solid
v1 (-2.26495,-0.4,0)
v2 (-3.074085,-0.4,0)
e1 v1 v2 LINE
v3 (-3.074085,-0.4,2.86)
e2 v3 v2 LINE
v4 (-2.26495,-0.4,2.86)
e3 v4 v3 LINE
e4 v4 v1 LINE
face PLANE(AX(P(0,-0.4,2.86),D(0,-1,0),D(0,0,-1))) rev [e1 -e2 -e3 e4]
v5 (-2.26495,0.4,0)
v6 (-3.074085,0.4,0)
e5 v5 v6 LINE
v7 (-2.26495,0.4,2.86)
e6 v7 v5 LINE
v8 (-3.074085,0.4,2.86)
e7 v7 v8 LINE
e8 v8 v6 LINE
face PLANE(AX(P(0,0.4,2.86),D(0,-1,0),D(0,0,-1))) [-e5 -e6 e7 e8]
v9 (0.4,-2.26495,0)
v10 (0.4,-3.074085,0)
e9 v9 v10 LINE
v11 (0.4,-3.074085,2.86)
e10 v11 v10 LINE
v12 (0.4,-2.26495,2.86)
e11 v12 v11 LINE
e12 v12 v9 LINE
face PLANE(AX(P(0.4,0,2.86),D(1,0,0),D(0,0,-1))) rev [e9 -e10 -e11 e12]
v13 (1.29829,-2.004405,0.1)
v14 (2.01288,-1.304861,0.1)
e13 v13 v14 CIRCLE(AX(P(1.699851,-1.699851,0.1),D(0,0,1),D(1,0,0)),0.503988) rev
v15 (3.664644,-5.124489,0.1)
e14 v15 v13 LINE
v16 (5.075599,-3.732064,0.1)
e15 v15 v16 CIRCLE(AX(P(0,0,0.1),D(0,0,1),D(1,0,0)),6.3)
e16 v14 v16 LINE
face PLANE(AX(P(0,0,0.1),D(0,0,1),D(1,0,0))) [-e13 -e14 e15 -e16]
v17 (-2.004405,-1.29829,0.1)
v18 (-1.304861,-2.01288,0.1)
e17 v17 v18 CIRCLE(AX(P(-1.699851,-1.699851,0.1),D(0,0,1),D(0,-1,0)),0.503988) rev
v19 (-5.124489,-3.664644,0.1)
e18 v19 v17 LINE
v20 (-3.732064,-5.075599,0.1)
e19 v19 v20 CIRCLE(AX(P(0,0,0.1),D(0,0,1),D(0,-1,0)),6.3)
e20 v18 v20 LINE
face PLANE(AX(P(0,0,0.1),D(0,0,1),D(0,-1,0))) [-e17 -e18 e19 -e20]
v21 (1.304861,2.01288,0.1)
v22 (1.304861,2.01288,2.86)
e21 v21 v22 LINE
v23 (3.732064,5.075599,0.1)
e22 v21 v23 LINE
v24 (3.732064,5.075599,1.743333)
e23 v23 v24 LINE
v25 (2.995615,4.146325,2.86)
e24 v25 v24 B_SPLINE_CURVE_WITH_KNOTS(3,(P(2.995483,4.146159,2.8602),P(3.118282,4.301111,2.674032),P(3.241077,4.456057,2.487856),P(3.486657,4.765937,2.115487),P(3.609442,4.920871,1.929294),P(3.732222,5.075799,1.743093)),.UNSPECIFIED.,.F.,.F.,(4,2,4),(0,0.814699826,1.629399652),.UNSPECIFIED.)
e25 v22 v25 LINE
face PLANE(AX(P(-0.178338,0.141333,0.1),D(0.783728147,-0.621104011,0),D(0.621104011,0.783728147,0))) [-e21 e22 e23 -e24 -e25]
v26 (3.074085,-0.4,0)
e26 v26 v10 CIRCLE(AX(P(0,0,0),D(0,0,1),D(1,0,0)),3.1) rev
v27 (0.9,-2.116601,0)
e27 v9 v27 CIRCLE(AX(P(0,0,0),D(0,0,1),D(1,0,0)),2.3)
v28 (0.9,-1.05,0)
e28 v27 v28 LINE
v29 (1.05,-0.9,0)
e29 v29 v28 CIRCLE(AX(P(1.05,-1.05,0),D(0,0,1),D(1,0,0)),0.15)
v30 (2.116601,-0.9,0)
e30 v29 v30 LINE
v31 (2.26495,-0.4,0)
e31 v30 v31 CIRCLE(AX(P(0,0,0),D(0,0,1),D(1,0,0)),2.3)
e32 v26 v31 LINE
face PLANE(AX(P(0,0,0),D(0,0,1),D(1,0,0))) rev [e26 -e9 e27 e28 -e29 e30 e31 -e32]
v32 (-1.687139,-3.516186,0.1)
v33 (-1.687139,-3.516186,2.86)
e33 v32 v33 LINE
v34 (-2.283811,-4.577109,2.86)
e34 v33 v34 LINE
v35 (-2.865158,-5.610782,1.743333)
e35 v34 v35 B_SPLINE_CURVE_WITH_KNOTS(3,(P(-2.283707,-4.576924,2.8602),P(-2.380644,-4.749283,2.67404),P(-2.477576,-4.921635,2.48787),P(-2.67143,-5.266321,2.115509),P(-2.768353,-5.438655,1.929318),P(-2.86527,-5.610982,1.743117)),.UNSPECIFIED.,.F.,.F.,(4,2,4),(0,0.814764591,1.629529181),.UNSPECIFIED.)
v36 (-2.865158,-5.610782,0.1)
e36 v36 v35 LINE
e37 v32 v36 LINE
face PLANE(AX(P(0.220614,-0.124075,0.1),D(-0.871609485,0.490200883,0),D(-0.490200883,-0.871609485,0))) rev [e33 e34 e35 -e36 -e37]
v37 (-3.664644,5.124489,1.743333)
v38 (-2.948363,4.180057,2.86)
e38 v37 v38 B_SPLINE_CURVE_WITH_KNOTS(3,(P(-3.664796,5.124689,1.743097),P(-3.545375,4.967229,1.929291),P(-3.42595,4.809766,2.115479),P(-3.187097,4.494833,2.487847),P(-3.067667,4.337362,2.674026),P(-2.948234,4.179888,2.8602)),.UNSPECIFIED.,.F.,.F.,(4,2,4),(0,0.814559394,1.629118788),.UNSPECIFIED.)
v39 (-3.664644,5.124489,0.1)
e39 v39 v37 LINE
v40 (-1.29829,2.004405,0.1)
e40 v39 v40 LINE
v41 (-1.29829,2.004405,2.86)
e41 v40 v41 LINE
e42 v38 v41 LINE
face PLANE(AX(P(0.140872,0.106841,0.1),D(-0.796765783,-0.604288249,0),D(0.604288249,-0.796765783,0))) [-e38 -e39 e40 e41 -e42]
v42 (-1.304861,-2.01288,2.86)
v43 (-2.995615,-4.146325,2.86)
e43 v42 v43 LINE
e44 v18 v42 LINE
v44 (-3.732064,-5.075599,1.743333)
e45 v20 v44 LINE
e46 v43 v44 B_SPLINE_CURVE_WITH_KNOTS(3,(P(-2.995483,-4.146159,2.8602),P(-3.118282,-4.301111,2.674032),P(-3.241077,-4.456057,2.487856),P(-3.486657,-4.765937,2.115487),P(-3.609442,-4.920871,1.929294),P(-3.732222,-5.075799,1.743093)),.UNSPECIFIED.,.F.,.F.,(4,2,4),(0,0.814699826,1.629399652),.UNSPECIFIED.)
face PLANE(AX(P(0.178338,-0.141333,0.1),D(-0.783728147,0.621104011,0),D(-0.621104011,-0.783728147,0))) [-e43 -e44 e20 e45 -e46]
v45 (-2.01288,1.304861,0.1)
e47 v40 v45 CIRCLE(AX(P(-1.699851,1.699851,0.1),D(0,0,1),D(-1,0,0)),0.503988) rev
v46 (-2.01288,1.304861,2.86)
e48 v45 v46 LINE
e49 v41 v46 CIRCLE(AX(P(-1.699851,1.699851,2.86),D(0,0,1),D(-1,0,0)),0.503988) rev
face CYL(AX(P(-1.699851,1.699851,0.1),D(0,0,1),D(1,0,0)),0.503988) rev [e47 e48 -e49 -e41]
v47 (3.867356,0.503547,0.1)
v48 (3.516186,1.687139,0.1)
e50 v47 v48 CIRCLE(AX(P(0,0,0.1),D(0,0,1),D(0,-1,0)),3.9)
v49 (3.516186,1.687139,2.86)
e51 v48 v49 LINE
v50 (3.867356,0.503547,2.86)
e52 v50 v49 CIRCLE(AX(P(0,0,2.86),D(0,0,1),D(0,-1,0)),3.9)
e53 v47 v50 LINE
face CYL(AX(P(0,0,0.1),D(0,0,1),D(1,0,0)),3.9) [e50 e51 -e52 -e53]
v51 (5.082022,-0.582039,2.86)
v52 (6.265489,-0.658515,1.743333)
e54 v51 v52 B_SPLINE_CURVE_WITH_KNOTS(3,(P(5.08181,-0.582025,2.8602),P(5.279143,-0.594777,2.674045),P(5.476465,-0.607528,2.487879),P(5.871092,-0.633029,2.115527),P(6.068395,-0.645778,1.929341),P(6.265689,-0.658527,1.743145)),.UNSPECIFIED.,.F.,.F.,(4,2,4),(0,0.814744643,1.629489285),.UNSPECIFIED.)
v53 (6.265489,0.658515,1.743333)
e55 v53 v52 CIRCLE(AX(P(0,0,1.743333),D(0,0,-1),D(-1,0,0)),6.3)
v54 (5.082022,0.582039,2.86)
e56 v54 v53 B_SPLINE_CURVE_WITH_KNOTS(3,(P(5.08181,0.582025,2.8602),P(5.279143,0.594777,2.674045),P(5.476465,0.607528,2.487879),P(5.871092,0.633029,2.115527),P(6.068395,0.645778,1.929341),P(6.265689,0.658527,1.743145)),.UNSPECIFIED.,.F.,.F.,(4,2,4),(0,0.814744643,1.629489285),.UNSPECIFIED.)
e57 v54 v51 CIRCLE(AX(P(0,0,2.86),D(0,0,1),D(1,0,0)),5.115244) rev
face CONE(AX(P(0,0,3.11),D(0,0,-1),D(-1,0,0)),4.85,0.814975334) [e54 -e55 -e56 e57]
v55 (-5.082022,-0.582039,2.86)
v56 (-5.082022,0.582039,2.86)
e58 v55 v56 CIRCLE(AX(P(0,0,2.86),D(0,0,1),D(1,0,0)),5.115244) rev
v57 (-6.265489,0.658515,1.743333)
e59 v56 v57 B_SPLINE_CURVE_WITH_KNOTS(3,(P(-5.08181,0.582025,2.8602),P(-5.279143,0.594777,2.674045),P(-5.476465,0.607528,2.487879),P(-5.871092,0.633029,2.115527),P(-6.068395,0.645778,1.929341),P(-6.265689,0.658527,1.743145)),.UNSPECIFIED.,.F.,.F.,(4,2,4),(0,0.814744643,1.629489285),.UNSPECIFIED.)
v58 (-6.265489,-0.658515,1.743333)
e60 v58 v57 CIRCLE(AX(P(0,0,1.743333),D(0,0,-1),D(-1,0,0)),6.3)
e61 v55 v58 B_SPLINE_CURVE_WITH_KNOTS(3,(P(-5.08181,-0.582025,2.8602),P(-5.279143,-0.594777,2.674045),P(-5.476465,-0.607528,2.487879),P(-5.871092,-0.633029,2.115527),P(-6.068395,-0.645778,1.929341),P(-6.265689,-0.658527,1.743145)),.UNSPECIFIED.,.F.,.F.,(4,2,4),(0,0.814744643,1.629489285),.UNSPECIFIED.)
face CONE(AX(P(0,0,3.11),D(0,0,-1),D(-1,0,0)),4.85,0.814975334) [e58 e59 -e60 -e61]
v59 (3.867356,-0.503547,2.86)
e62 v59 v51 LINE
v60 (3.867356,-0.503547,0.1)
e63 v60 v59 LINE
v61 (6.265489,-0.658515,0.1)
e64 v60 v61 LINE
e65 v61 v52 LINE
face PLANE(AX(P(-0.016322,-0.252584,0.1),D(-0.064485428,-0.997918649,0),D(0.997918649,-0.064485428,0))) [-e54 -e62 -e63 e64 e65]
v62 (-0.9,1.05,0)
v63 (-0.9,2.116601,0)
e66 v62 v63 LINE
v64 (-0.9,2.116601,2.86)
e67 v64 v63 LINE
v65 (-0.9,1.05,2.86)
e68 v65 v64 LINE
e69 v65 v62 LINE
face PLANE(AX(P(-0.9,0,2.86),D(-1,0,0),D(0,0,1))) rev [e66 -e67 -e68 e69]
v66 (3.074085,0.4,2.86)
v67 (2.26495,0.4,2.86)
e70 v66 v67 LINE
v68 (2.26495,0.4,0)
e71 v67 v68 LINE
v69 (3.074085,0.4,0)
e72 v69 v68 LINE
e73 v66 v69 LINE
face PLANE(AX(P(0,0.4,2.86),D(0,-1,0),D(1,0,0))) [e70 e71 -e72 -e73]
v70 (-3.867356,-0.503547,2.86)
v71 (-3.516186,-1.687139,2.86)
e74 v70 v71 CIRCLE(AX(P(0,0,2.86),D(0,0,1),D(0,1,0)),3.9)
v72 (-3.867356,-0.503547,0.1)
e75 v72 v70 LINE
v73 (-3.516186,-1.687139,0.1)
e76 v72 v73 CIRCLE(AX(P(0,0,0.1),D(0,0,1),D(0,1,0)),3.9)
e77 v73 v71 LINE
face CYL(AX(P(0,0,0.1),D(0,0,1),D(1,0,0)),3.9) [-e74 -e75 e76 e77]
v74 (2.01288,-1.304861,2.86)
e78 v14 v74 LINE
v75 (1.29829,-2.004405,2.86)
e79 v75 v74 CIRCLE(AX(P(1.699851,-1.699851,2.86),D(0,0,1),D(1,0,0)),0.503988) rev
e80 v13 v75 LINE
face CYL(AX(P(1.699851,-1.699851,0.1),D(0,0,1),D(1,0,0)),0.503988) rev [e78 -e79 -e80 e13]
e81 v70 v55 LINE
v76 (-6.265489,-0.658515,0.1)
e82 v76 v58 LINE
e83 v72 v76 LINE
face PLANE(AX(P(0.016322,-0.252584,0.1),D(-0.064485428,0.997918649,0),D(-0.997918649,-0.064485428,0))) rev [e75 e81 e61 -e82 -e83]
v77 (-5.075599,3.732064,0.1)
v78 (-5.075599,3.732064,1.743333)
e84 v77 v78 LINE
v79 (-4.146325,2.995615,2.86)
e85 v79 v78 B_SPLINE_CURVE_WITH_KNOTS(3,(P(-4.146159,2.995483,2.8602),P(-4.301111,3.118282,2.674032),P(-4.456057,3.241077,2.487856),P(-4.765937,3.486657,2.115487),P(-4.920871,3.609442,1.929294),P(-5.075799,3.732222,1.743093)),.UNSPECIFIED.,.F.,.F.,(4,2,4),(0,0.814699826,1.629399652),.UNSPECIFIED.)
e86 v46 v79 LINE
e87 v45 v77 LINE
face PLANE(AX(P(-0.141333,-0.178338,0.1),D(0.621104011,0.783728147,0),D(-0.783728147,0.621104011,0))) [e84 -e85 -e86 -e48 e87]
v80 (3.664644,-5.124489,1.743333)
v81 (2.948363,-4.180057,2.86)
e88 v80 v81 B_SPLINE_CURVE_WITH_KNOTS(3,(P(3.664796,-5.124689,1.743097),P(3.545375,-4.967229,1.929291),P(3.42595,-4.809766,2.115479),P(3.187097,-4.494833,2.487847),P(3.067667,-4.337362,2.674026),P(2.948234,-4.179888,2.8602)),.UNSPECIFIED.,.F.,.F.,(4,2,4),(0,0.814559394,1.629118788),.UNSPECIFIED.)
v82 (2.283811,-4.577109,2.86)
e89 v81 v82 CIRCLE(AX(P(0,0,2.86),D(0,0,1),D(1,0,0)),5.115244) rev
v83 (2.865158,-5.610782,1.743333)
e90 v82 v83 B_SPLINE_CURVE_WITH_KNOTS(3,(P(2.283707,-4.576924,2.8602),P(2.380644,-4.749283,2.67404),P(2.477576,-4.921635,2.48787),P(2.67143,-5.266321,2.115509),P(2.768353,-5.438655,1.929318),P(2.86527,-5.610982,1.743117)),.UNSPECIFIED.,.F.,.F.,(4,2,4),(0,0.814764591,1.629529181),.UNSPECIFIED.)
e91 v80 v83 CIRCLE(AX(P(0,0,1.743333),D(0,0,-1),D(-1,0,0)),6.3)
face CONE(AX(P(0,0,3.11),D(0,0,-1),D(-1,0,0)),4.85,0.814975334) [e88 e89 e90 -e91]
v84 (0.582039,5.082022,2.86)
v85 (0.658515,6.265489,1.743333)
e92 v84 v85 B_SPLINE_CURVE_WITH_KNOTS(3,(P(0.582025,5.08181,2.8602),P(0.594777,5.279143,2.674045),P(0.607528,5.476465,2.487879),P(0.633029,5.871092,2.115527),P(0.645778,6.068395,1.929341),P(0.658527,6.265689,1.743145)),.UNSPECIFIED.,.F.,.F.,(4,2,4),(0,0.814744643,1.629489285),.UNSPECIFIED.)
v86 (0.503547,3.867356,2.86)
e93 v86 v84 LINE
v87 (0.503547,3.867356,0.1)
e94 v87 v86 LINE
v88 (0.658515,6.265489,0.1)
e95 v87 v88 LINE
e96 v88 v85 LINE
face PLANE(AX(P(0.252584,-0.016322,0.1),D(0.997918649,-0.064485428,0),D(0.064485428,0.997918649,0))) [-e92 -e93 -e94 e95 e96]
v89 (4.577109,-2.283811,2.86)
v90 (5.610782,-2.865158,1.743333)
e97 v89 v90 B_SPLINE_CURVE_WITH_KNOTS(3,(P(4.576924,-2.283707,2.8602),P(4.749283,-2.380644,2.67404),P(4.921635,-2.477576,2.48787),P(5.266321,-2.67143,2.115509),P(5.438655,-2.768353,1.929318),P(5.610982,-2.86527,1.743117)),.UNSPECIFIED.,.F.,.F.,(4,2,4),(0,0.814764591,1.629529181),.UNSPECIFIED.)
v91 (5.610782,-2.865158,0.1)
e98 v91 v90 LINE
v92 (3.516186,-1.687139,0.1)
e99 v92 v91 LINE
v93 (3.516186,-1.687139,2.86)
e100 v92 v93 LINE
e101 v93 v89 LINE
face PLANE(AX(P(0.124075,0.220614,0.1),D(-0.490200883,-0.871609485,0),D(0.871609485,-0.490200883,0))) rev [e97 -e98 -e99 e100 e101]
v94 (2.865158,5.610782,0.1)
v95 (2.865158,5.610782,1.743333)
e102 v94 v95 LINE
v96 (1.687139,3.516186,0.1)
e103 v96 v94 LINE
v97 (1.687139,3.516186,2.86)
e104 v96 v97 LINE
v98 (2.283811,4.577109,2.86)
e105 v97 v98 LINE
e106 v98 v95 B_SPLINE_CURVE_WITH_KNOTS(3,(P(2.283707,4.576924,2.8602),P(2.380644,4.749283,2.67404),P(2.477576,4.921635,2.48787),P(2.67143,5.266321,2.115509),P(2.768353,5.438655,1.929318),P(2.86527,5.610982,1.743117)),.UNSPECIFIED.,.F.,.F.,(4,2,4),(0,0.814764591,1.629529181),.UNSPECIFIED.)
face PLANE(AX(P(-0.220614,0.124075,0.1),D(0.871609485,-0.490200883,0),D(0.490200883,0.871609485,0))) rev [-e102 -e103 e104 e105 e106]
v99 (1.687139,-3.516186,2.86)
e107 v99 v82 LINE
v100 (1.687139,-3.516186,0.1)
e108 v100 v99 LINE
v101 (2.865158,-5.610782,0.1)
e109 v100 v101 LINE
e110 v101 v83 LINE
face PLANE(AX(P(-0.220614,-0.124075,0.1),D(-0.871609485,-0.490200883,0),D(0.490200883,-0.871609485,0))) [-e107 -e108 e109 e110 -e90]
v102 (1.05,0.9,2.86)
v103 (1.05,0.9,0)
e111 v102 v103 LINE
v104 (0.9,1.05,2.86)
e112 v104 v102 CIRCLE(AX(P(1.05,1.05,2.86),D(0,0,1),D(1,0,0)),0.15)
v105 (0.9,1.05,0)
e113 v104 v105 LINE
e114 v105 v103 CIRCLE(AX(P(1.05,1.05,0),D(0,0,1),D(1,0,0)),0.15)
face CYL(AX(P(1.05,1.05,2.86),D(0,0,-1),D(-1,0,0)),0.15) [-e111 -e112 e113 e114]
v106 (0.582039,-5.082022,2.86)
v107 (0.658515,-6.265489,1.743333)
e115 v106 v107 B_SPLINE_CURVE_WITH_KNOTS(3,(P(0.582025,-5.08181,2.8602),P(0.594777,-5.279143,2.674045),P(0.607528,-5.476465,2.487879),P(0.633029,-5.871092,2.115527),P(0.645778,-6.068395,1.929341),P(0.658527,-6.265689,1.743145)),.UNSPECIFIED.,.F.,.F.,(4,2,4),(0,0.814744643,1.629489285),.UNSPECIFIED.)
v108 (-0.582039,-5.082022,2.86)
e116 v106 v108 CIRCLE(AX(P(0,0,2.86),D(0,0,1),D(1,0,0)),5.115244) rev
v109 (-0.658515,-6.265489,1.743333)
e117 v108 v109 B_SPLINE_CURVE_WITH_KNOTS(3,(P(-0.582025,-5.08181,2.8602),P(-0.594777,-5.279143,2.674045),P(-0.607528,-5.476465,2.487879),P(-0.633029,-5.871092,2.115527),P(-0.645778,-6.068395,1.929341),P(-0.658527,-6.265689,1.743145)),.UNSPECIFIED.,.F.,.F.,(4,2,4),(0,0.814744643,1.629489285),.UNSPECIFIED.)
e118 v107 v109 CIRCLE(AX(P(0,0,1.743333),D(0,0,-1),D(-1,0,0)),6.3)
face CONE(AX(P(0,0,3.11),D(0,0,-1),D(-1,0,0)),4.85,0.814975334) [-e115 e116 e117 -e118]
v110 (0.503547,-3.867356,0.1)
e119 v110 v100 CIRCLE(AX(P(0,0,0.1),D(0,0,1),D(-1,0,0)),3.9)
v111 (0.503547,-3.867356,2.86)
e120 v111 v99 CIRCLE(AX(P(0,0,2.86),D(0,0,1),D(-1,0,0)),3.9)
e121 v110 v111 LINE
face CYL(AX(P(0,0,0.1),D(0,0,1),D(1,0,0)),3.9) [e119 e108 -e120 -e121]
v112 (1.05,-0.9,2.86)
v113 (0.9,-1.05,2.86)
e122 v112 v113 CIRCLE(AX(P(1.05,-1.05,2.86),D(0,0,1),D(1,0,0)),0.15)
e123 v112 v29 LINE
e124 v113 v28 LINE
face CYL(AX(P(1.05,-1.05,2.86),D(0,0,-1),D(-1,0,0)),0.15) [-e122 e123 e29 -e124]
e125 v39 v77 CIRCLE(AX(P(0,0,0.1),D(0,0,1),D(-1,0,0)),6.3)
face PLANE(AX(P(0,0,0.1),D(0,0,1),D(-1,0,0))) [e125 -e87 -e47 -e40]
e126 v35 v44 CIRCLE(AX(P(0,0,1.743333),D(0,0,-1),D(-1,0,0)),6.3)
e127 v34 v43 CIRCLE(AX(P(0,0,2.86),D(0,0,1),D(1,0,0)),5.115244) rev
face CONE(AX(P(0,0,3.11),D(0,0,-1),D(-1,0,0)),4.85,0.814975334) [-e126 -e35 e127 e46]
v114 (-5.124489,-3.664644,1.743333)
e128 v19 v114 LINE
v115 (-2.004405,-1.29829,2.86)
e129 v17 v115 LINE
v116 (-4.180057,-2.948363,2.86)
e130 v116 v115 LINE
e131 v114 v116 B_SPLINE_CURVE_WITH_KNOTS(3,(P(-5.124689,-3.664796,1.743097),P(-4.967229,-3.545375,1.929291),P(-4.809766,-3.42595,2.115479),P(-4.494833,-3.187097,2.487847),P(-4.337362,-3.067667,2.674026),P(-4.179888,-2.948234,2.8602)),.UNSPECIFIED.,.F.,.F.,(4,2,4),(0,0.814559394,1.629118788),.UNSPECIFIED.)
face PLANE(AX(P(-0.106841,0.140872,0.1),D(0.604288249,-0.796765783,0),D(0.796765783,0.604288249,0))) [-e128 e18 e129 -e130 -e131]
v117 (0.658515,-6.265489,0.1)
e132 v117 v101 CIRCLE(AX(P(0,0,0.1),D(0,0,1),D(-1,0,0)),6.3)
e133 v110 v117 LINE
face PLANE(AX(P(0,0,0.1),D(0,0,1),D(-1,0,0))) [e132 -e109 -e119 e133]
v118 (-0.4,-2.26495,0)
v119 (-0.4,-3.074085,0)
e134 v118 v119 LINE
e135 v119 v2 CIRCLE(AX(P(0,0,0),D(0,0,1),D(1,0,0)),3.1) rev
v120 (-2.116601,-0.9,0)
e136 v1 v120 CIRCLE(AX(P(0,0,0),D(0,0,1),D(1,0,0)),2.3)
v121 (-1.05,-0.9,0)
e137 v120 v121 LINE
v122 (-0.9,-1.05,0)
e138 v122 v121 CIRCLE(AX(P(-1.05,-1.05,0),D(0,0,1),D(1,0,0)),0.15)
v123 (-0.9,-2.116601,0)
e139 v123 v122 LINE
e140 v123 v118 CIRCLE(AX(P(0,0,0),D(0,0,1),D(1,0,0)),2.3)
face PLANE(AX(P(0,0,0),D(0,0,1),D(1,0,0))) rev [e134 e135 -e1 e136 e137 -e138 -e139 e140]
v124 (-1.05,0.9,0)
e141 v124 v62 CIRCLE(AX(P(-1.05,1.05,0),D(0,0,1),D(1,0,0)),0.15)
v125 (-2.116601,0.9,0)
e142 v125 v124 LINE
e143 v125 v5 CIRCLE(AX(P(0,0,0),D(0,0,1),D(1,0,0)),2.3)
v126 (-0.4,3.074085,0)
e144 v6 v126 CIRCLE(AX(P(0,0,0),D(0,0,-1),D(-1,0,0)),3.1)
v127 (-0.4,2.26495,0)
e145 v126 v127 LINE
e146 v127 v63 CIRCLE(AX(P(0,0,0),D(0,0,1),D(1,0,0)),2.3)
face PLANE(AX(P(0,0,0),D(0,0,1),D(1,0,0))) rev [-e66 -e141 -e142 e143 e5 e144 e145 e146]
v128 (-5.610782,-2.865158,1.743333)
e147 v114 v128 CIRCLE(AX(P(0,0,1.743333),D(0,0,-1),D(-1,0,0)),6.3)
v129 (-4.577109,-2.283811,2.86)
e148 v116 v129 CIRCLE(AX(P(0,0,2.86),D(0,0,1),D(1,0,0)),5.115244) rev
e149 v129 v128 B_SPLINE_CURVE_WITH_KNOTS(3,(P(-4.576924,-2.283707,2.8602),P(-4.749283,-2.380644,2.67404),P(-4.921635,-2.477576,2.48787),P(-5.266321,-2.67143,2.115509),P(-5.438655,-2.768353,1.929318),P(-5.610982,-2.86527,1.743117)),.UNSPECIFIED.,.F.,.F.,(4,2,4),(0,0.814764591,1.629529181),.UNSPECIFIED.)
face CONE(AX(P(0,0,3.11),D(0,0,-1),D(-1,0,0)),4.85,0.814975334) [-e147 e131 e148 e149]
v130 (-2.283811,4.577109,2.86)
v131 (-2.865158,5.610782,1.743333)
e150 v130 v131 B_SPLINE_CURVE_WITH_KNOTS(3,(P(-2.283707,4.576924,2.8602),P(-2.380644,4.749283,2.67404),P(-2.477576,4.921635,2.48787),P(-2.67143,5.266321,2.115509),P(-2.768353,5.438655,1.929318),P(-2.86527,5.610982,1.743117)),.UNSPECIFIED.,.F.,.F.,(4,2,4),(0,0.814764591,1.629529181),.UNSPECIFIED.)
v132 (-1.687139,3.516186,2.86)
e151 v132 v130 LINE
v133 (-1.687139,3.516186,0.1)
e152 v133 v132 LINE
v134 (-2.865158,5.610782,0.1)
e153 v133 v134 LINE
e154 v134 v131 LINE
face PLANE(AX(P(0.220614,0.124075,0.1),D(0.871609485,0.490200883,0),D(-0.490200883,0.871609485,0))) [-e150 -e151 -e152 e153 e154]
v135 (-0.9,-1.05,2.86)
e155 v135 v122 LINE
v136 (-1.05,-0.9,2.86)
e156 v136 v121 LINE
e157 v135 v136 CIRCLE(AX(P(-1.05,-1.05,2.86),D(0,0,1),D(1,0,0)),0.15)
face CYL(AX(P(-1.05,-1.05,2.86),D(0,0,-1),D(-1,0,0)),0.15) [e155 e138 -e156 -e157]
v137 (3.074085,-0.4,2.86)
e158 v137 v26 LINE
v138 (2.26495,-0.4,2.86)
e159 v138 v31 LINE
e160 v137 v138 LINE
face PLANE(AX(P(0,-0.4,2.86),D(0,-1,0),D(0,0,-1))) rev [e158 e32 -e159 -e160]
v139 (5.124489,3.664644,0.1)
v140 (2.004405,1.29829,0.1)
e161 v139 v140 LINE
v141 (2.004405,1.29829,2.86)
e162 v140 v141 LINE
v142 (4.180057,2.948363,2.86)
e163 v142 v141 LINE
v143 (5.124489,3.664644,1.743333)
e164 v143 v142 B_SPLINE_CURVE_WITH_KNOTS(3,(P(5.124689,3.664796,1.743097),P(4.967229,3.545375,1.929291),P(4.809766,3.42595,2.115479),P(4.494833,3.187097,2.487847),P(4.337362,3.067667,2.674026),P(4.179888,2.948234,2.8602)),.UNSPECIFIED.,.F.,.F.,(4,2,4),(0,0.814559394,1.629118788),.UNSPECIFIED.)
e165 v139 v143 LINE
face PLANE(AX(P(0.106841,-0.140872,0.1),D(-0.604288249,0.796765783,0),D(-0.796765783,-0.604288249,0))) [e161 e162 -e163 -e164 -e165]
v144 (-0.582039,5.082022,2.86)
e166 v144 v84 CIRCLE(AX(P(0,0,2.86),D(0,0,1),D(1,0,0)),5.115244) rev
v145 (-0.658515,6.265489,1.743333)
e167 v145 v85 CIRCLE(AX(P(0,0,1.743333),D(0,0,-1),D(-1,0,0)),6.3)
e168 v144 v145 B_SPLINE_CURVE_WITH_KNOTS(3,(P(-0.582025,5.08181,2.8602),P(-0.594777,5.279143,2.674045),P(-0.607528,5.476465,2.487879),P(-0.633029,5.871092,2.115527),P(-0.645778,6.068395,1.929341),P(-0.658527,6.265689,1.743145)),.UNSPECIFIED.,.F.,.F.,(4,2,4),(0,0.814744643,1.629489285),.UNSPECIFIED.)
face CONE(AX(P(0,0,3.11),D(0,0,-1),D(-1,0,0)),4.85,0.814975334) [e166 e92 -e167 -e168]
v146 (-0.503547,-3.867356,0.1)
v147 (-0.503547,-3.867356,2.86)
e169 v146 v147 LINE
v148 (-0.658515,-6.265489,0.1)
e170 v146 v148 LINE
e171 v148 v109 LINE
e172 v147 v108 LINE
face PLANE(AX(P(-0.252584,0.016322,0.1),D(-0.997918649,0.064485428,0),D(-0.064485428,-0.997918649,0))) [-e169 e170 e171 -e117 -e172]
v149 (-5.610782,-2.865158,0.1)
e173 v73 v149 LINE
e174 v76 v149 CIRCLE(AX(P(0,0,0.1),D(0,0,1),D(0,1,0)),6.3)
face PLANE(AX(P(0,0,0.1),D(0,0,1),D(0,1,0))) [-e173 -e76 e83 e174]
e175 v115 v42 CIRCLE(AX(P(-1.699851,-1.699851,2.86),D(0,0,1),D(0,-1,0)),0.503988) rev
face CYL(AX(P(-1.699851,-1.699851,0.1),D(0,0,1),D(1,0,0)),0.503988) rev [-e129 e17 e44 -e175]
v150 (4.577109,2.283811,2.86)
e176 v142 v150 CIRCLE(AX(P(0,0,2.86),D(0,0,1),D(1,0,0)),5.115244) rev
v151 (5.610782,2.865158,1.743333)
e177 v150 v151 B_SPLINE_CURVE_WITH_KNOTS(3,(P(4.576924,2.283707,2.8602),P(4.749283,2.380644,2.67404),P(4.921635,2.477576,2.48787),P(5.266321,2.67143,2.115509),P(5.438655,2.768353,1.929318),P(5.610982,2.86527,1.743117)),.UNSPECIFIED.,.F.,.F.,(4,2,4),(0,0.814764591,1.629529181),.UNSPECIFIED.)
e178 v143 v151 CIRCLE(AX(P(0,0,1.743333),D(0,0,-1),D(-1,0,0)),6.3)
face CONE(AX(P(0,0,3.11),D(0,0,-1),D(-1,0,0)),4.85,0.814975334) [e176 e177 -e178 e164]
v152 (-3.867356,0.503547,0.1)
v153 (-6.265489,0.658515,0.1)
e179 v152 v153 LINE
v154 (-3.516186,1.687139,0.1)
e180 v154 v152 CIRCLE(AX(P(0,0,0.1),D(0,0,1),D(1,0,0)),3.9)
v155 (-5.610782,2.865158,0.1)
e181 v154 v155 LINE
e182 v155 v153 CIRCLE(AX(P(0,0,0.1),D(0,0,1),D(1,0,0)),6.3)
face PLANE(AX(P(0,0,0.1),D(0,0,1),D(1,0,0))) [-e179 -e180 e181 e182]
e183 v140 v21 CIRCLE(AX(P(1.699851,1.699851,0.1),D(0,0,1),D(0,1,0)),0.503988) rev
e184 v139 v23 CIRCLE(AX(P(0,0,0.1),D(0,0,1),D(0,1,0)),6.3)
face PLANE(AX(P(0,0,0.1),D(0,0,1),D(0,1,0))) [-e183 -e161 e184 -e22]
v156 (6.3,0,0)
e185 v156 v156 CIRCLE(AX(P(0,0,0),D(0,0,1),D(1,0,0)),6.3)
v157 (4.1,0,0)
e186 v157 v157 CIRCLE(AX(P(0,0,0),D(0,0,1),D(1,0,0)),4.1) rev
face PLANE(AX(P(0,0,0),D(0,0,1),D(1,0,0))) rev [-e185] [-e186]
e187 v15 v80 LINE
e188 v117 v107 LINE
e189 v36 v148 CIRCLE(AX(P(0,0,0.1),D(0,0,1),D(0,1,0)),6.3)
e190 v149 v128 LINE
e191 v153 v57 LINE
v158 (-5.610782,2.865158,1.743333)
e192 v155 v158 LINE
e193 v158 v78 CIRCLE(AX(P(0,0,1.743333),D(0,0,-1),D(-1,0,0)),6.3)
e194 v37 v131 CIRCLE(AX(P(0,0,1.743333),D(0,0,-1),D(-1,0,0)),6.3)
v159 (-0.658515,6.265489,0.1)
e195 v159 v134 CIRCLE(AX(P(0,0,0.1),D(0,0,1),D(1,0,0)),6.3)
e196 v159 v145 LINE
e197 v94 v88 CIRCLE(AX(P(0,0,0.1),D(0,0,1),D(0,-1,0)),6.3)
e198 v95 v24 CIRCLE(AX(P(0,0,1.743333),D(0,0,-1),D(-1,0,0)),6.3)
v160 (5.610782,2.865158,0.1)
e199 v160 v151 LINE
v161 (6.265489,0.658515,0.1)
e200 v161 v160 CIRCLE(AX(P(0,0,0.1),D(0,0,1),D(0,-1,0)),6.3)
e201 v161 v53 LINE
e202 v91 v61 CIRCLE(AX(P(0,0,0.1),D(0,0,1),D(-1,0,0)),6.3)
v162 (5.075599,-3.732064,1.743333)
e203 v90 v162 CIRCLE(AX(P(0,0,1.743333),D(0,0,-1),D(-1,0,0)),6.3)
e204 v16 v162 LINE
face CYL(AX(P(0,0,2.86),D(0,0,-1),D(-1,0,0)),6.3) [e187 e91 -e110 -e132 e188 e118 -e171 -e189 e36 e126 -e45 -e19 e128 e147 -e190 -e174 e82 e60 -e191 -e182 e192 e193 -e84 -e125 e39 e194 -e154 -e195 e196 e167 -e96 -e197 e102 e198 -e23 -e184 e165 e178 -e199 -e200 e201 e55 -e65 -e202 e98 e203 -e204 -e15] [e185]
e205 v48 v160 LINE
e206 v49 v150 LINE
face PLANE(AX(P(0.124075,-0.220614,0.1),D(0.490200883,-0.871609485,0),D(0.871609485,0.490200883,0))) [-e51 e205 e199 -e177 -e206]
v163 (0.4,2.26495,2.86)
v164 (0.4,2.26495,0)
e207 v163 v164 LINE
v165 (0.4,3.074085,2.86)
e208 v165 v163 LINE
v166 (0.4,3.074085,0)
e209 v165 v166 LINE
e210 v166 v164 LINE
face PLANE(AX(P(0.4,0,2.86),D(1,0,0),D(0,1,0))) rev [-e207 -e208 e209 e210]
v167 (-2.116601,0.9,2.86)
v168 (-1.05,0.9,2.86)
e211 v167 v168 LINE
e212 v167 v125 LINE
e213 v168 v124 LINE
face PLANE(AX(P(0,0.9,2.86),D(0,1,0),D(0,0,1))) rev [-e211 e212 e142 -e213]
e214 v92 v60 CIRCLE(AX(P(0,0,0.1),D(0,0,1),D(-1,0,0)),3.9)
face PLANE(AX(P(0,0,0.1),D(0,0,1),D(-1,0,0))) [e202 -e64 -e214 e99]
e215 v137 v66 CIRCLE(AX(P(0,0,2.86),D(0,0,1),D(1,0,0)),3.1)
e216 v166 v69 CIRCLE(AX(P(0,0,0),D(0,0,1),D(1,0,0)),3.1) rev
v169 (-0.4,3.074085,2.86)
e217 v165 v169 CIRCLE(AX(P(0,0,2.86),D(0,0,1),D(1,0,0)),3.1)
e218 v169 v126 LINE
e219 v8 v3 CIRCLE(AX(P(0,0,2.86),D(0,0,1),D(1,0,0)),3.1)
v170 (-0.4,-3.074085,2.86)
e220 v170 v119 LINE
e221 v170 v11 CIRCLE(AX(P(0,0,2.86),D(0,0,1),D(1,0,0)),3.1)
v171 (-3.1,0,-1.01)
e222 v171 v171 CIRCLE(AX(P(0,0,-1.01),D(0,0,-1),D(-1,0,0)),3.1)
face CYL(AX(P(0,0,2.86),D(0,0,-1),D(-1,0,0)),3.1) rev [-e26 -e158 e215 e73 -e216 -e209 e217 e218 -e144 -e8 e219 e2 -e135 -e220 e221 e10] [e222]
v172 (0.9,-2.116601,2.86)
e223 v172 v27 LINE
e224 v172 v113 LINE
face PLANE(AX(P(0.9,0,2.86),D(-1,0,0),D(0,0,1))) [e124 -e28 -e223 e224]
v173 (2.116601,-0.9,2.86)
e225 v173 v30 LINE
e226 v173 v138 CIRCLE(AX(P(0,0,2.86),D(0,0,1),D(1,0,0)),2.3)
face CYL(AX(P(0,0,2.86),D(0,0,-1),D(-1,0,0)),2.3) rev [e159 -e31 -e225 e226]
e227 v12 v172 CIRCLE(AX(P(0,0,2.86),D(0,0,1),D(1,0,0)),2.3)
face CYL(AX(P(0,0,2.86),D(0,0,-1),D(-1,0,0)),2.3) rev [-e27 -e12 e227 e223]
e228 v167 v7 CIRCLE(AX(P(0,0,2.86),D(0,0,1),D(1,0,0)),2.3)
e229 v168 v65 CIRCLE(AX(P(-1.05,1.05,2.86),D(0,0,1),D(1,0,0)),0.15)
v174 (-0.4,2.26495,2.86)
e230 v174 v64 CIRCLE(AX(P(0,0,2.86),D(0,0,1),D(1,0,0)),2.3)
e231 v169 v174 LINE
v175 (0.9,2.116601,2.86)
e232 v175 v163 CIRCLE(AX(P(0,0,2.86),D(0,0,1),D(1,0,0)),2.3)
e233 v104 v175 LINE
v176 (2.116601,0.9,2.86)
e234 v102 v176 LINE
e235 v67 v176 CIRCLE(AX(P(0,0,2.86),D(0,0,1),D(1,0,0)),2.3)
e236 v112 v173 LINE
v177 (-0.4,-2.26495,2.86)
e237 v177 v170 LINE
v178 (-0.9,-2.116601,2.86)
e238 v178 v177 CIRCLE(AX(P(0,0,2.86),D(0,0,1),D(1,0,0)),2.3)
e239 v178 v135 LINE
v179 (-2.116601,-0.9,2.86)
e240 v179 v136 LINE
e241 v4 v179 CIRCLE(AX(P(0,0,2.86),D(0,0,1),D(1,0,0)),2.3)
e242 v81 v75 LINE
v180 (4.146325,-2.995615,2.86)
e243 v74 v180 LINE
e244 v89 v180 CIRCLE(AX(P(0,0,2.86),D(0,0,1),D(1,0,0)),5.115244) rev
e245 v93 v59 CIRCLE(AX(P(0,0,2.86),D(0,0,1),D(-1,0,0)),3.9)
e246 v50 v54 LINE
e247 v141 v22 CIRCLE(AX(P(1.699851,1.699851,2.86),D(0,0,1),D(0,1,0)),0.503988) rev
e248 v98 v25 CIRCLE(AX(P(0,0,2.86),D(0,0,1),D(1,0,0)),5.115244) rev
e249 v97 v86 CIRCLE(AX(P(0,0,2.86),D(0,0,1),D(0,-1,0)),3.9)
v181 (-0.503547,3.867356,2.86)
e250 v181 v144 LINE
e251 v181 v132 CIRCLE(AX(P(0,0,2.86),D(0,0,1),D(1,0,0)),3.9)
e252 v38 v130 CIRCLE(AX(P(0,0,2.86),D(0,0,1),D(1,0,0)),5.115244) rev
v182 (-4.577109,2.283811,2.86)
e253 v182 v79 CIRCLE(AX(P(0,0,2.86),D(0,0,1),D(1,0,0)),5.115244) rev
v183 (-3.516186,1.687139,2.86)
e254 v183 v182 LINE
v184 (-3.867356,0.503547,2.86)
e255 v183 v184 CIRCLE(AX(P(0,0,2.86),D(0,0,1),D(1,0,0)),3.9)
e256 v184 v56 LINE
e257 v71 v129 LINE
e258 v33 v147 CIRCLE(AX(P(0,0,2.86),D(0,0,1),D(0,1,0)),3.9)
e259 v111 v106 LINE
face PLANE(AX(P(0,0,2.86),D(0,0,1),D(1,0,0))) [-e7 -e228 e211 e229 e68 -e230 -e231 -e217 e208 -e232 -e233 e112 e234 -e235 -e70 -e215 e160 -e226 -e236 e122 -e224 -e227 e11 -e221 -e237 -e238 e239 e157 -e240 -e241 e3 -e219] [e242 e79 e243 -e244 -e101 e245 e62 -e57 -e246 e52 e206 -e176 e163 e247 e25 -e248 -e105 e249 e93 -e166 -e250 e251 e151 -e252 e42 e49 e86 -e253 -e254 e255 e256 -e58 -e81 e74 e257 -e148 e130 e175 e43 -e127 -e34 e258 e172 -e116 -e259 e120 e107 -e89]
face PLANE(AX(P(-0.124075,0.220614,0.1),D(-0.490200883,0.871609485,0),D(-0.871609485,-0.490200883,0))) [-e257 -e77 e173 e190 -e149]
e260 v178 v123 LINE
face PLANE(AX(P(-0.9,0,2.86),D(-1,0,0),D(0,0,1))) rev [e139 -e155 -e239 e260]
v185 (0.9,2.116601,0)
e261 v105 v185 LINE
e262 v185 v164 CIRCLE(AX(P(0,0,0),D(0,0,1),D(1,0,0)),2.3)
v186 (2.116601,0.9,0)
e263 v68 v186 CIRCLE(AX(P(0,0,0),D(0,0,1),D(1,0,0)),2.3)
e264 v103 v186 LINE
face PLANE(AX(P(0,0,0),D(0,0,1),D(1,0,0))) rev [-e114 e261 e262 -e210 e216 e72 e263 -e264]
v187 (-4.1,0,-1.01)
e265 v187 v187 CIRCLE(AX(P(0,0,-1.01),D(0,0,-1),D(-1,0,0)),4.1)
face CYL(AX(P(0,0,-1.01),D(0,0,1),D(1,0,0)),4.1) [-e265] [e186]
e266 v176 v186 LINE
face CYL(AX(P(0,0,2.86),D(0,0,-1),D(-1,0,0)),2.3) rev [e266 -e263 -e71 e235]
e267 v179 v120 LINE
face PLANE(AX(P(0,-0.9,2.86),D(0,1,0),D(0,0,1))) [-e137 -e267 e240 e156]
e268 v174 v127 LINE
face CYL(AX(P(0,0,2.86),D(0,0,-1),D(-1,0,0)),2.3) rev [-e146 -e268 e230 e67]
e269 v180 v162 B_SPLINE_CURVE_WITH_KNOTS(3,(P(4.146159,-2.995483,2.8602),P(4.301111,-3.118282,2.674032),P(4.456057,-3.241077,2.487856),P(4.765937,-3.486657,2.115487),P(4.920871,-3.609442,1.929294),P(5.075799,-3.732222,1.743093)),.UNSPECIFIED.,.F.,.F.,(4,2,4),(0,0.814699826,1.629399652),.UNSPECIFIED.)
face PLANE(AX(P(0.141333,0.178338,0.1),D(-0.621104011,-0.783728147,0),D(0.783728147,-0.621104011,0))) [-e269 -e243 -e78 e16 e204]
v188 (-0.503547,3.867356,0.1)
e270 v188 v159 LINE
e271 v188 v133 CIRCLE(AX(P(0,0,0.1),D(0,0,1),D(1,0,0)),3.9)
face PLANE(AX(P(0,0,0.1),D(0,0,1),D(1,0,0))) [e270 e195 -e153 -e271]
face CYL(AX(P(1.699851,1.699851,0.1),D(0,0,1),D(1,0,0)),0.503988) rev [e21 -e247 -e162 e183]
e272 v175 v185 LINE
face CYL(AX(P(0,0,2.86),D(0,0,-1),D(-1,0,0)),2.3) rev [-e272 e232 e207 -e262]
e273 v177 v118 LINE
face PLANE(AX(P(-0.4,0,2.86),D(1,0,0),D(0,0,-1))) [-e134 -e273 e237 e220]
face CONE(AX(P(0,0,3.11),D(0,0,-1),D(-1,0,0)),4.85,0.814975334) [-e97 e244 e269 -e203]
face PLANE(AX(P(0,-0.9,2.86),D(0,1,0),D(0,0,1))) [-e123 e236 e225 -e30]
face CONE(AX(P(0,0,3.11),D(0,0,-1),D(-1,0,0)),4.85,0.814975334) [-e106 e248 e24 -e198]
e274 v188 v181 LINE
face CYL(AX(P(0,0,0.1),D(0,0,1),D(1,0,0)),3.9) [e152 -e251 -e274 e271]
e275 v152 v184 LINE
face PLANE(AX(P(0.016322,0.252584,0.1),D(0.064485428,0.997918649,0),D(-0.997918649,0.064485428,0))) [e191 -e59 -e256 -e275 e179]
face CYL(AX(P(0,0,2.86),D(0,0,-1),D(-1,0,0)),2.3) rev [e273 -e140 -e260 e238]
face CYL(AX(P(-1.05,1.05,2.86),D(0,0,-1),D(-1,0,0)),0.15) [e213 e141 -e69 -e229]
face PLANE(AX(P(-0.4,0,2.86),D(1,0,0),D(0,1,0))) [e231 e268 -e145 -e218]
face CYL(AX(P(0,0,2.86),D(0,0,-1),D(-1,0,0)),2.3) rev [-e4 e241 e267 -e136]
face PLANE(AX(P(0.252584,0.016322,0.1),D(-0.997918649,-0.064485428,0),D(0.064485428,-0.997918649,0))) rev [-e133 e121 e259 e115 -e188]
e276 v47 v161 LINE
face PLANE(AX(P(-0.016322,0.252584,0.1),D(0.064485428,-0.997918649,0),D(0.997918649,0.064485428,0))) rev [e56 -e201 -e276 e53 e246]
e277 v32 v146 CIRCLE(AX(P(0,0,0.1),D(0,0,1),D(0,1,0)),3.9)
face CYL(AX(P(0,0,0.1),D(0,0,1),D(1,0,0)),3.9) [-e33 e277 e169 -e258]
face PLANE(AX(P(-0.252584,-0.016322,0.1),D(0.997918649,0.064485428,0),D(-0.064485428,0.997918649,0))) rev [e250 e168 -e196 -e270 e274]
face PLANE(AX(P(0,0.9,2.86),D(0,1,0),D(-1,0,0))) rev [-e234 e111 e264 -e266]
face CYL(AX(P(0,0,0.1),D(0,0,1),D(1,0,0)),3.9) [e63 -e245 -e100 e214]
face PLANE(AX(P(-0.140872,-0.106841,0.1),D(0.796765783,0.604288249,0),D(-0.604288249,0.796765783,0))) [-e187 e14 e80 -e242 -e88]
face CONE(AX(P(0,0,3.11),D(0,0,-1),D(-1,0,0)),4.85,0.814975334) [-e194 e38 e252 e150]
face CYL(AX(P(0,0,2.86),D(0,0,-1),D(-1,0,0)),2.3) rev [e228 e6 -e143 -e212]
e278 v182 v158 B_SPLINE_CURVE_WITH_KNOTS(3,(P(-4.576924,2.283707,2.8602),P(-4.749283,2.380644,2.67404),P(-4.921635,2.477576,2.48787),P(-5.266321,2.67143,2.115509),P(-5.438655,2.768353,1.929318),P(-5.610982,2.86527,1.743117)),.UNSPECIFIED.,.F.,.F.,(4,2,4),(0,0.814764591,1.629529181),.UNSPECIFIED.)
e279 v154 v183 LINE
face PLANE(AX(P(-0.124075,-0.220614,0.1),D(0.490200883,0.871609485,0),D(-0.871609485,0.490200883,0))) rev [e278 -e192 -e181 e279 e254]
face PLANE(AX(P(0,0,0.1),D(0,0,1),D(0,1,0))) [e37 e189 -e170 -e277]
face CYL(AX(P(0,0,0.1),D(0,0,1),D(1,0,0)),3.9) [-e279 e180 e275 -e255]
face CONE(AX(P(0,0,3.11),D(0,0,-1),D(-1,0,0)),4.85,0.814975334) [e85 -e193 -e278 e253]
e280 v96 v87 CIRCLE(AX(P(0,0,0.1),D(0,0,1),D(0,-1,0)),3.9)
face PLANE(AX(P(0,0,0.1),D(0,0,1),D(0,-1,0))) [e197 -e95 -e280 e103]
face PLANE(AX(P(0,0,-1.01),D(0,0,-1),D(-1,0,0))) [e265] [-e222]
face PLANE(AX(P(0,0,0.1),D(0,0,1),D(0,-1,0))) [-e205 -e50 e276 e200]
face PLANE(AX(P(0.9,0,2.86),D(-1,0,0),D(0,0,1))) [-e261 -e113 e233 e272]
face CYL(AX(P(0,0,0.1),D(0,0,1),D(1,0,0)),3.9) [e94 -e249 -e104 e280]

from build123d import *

# Parameters (mm, degrees)
SKETCH1_R           = 6.3
BOSS_EXTRUDE1_DEPTH = 2.86
BOSS_EXTRUDE2_START = 1.01
SKETCH2_R           = 4.1
SKETCH2_R_2         = 3.1
BOSS_EXTRUDE2_DEPTH = 1.01
CUT_EXTRUDE1_START  = -2.76
CUT_EXTRUDE1_DEPTH  = 2.76
CIRPATTERN1_COUNT   = 4


with BuildPart() as part:
    # Sketch1 → Boss-Extrude1 (new body)
    with BuildSketch(Plane.XY):
        Circle(SKETCH1_R)
        with BuildLine():
            Line((-1.05, -0.9), (-2.116601049, -0.9))
            ThreePointArc((-2.116601049, -0.9), (-2.204993905, -0.654218524), (-2.264950331, -0.4))
            Line((-2.264950331, -0.4), (-3.07408523, -0.4))
            ThreePointArc((-3.07408523, -0.4), (-3.1, 0), (-3.07408523, 0.4))
            Line((-3.07408523, 0.4), (-2.264950331, 0.4))
            ThreePointArc((-2.264950331, 0.4), (-2.204993905, 0.654218524), (-2.116601049, 0.9))
            Line((-2.116601049, 0.9), (-1.05, 0.9))
            ThreePointArc((-1.05, 0.9), (-0.943933983, 0.943933983), (-0.9, 1.05))
            Line((-0.9, 1.05), (-0.9, 2.116601049))
            ThreePointArc((-0.9, 2.116601049), (-0.654218524, 2.204993905), (-0.4, 2.264950331))
            Line((-0.4, 2.264950331), (-0.4, 3.07408523))
            ThreePointArc((-0.4, 3.07408523), (0, 3.1), (0.4, 3.07408523))
            Line((0.4, 3.07408523), (0.4, 2.264950331))
            ThreePointArc((0.4, 2.264950331), (0.654218524, 2.204993905), (0.9, 2.116601049))
            Line((0.9, 2.116601049), (0.9, 1.05))
            ThreePointArc((0.9, 1.05), (0.943933983, 0.943933983), (1.05, 0.9))
            Line((1.05, 0.9), (2.116601049, 0.9))
            ThreePointArc((2.116601049, 0.9), (2.204993905, 0.654218524), (2.264950331, 0.4))
            Line((2.264950331, 0.4), (3.07408523, 0.4))
            ThreePointArc((3.07408523, 0.4), (3.1, 0), (3.07408523, -0.4))
            Line((3.07408523, -0.4), (2.264950331, -0.4))
            ThreePointArc((2.264950331, -0.4), (2.204993905, -0.654218524), (2.116601049, -0.9))
            Line((2.116601049, -0.9), (1.05, -0.9))
            ThreePointArc((1.05, -0.9), (0.943933983, -0.943933983), (0.9, -1.05))
            Line((0.9, -1.05), (0.9, -2.116601049))
            ThreePointArc((0.9, -2.116601049), (0.654218524, -2.204993905), (0.4, -2.264950331))
            Line((0.4, -2.264950331), (0.4, -3.07408523))
            ThreePointArc((0.4, -3.07408523), (0, -3.1), (-0.4, -3.07408523))
            Line((-0.4, -3.07408523), (-0.4, -2.264950331))
            ThreePointArc((-0.4, -2.264950331), (-0.654218524, -2.204993905), (-0.9, -2.116601049))
            Line((-0.9, -2.116601049), (-0.9, -1.05))
            ThreePointArc((-0.9, -1.05), (-0.943933983, -0.943933983), (-1.05, -0.9))
        make_face(mode=Mode.SUBTRACT)
    extrude(amount=BOSS_EXTRUDE1_DEPTH)

    # Sketch2 → Boss-Extrude2 (add)
    with BuildSketch(Plane(origin=(0, 0, 0), x_dir=(-1, 0, 0), z_dir=(0, 0, -1)).offset(BOSS_EXTRUDE2_START)):
        Circle(SKETCH2_R)
        Circle(SKETCH2_R_2, mode=Mode.SUBTRACT)
    extrude(amount=-BOSS_EXTRUDE2_DEPTH)

    # Sketch3 → Cut-Extrude1 (cut)
    with BuildSketch(Plane.XY.offset(2.86).offset(CUT_EXTRUDE1_START)):
        with BuildLine():
            ThreePointArc((-1.687138839, 3.516185794), (-1.109327063, 3.738902709), (-0.503547315, 3.867355699))
            Line((-0.503547315, 3.867355699), (-0.658514541, 6.265489494))
            ThreePointArc((-0.658514541, 6.265489494), (-1.791989871, 6.039765915), (-2.865158016, 5.610781545))
            Line((-2.865158016, 5.610781545), (-1.687138839, 3.516185794))
        make_face()
        with BuildLine():
            Line((1.298290287, -2.004404983), (3.664644204, -5.124488546))
            ThreePointArc((3.664644204, -5.124488546), (4.425231419, -4.48411941), (5.075598647, -3.732063554))
            Line((5.075598647, -3.732063554), (2.012879929, -1.304861101))
            ThreePointArc((2.012879929, -1.304861101), (1.347288977, -1.339706092), (1.298290287, -2.004404983))
        make_face()
        with BuildLine():
            ThreePointArc((-3.867355699, 0.503547315), (-3.738902709, 1.109327063), (-3.516185794, 1.687138839))
            Line((-3.516185794, 1.687138839), (-5.610781545, 2.865158016))
            ThreePointArc((-5.610781545, 2.865158016), (-6.039765915, 1.791989871), (-6.265489494, 0.658514541))
            Line((-6.265489494, 0.658514541), (-3.867355699, 0.503547315))
        make_face()
    cut_extrude1 = extrude(amount=CUT_EXTRUDE1_DEPTH, mode=Mode.SUBTRACT)

    # CirPattern1: Cut-Extrude1 ×4 about axis
    cirpattern1_axis = Axis((0, 0, 2.86), (0, 0, 1))
    for i in range(1, CIRPATTERN1_COUNT):
        add(cut_extrude1.rotate(cirpattern1_axis, i * 360 / CIRPATTERN1_COUNT), mode=Mode.SUBTRACT)

    # Sketch5 → Cut-Revolve1 (revolve, cut)
    with BuildSketch(Plane(origin=(0, 0, 0), x_dir=(1, 0, 0), z_dir=(0, 1, 0))):
        Polygon((-6.59, -3.11), (-6.59, -1.47), (-4.85, -3.11), align=None)
    revolve(axis=Axis((0, 0, -2.797897232), (0, 0, 1)), mode=Mode.SUBTRACT)


solid = part.part
